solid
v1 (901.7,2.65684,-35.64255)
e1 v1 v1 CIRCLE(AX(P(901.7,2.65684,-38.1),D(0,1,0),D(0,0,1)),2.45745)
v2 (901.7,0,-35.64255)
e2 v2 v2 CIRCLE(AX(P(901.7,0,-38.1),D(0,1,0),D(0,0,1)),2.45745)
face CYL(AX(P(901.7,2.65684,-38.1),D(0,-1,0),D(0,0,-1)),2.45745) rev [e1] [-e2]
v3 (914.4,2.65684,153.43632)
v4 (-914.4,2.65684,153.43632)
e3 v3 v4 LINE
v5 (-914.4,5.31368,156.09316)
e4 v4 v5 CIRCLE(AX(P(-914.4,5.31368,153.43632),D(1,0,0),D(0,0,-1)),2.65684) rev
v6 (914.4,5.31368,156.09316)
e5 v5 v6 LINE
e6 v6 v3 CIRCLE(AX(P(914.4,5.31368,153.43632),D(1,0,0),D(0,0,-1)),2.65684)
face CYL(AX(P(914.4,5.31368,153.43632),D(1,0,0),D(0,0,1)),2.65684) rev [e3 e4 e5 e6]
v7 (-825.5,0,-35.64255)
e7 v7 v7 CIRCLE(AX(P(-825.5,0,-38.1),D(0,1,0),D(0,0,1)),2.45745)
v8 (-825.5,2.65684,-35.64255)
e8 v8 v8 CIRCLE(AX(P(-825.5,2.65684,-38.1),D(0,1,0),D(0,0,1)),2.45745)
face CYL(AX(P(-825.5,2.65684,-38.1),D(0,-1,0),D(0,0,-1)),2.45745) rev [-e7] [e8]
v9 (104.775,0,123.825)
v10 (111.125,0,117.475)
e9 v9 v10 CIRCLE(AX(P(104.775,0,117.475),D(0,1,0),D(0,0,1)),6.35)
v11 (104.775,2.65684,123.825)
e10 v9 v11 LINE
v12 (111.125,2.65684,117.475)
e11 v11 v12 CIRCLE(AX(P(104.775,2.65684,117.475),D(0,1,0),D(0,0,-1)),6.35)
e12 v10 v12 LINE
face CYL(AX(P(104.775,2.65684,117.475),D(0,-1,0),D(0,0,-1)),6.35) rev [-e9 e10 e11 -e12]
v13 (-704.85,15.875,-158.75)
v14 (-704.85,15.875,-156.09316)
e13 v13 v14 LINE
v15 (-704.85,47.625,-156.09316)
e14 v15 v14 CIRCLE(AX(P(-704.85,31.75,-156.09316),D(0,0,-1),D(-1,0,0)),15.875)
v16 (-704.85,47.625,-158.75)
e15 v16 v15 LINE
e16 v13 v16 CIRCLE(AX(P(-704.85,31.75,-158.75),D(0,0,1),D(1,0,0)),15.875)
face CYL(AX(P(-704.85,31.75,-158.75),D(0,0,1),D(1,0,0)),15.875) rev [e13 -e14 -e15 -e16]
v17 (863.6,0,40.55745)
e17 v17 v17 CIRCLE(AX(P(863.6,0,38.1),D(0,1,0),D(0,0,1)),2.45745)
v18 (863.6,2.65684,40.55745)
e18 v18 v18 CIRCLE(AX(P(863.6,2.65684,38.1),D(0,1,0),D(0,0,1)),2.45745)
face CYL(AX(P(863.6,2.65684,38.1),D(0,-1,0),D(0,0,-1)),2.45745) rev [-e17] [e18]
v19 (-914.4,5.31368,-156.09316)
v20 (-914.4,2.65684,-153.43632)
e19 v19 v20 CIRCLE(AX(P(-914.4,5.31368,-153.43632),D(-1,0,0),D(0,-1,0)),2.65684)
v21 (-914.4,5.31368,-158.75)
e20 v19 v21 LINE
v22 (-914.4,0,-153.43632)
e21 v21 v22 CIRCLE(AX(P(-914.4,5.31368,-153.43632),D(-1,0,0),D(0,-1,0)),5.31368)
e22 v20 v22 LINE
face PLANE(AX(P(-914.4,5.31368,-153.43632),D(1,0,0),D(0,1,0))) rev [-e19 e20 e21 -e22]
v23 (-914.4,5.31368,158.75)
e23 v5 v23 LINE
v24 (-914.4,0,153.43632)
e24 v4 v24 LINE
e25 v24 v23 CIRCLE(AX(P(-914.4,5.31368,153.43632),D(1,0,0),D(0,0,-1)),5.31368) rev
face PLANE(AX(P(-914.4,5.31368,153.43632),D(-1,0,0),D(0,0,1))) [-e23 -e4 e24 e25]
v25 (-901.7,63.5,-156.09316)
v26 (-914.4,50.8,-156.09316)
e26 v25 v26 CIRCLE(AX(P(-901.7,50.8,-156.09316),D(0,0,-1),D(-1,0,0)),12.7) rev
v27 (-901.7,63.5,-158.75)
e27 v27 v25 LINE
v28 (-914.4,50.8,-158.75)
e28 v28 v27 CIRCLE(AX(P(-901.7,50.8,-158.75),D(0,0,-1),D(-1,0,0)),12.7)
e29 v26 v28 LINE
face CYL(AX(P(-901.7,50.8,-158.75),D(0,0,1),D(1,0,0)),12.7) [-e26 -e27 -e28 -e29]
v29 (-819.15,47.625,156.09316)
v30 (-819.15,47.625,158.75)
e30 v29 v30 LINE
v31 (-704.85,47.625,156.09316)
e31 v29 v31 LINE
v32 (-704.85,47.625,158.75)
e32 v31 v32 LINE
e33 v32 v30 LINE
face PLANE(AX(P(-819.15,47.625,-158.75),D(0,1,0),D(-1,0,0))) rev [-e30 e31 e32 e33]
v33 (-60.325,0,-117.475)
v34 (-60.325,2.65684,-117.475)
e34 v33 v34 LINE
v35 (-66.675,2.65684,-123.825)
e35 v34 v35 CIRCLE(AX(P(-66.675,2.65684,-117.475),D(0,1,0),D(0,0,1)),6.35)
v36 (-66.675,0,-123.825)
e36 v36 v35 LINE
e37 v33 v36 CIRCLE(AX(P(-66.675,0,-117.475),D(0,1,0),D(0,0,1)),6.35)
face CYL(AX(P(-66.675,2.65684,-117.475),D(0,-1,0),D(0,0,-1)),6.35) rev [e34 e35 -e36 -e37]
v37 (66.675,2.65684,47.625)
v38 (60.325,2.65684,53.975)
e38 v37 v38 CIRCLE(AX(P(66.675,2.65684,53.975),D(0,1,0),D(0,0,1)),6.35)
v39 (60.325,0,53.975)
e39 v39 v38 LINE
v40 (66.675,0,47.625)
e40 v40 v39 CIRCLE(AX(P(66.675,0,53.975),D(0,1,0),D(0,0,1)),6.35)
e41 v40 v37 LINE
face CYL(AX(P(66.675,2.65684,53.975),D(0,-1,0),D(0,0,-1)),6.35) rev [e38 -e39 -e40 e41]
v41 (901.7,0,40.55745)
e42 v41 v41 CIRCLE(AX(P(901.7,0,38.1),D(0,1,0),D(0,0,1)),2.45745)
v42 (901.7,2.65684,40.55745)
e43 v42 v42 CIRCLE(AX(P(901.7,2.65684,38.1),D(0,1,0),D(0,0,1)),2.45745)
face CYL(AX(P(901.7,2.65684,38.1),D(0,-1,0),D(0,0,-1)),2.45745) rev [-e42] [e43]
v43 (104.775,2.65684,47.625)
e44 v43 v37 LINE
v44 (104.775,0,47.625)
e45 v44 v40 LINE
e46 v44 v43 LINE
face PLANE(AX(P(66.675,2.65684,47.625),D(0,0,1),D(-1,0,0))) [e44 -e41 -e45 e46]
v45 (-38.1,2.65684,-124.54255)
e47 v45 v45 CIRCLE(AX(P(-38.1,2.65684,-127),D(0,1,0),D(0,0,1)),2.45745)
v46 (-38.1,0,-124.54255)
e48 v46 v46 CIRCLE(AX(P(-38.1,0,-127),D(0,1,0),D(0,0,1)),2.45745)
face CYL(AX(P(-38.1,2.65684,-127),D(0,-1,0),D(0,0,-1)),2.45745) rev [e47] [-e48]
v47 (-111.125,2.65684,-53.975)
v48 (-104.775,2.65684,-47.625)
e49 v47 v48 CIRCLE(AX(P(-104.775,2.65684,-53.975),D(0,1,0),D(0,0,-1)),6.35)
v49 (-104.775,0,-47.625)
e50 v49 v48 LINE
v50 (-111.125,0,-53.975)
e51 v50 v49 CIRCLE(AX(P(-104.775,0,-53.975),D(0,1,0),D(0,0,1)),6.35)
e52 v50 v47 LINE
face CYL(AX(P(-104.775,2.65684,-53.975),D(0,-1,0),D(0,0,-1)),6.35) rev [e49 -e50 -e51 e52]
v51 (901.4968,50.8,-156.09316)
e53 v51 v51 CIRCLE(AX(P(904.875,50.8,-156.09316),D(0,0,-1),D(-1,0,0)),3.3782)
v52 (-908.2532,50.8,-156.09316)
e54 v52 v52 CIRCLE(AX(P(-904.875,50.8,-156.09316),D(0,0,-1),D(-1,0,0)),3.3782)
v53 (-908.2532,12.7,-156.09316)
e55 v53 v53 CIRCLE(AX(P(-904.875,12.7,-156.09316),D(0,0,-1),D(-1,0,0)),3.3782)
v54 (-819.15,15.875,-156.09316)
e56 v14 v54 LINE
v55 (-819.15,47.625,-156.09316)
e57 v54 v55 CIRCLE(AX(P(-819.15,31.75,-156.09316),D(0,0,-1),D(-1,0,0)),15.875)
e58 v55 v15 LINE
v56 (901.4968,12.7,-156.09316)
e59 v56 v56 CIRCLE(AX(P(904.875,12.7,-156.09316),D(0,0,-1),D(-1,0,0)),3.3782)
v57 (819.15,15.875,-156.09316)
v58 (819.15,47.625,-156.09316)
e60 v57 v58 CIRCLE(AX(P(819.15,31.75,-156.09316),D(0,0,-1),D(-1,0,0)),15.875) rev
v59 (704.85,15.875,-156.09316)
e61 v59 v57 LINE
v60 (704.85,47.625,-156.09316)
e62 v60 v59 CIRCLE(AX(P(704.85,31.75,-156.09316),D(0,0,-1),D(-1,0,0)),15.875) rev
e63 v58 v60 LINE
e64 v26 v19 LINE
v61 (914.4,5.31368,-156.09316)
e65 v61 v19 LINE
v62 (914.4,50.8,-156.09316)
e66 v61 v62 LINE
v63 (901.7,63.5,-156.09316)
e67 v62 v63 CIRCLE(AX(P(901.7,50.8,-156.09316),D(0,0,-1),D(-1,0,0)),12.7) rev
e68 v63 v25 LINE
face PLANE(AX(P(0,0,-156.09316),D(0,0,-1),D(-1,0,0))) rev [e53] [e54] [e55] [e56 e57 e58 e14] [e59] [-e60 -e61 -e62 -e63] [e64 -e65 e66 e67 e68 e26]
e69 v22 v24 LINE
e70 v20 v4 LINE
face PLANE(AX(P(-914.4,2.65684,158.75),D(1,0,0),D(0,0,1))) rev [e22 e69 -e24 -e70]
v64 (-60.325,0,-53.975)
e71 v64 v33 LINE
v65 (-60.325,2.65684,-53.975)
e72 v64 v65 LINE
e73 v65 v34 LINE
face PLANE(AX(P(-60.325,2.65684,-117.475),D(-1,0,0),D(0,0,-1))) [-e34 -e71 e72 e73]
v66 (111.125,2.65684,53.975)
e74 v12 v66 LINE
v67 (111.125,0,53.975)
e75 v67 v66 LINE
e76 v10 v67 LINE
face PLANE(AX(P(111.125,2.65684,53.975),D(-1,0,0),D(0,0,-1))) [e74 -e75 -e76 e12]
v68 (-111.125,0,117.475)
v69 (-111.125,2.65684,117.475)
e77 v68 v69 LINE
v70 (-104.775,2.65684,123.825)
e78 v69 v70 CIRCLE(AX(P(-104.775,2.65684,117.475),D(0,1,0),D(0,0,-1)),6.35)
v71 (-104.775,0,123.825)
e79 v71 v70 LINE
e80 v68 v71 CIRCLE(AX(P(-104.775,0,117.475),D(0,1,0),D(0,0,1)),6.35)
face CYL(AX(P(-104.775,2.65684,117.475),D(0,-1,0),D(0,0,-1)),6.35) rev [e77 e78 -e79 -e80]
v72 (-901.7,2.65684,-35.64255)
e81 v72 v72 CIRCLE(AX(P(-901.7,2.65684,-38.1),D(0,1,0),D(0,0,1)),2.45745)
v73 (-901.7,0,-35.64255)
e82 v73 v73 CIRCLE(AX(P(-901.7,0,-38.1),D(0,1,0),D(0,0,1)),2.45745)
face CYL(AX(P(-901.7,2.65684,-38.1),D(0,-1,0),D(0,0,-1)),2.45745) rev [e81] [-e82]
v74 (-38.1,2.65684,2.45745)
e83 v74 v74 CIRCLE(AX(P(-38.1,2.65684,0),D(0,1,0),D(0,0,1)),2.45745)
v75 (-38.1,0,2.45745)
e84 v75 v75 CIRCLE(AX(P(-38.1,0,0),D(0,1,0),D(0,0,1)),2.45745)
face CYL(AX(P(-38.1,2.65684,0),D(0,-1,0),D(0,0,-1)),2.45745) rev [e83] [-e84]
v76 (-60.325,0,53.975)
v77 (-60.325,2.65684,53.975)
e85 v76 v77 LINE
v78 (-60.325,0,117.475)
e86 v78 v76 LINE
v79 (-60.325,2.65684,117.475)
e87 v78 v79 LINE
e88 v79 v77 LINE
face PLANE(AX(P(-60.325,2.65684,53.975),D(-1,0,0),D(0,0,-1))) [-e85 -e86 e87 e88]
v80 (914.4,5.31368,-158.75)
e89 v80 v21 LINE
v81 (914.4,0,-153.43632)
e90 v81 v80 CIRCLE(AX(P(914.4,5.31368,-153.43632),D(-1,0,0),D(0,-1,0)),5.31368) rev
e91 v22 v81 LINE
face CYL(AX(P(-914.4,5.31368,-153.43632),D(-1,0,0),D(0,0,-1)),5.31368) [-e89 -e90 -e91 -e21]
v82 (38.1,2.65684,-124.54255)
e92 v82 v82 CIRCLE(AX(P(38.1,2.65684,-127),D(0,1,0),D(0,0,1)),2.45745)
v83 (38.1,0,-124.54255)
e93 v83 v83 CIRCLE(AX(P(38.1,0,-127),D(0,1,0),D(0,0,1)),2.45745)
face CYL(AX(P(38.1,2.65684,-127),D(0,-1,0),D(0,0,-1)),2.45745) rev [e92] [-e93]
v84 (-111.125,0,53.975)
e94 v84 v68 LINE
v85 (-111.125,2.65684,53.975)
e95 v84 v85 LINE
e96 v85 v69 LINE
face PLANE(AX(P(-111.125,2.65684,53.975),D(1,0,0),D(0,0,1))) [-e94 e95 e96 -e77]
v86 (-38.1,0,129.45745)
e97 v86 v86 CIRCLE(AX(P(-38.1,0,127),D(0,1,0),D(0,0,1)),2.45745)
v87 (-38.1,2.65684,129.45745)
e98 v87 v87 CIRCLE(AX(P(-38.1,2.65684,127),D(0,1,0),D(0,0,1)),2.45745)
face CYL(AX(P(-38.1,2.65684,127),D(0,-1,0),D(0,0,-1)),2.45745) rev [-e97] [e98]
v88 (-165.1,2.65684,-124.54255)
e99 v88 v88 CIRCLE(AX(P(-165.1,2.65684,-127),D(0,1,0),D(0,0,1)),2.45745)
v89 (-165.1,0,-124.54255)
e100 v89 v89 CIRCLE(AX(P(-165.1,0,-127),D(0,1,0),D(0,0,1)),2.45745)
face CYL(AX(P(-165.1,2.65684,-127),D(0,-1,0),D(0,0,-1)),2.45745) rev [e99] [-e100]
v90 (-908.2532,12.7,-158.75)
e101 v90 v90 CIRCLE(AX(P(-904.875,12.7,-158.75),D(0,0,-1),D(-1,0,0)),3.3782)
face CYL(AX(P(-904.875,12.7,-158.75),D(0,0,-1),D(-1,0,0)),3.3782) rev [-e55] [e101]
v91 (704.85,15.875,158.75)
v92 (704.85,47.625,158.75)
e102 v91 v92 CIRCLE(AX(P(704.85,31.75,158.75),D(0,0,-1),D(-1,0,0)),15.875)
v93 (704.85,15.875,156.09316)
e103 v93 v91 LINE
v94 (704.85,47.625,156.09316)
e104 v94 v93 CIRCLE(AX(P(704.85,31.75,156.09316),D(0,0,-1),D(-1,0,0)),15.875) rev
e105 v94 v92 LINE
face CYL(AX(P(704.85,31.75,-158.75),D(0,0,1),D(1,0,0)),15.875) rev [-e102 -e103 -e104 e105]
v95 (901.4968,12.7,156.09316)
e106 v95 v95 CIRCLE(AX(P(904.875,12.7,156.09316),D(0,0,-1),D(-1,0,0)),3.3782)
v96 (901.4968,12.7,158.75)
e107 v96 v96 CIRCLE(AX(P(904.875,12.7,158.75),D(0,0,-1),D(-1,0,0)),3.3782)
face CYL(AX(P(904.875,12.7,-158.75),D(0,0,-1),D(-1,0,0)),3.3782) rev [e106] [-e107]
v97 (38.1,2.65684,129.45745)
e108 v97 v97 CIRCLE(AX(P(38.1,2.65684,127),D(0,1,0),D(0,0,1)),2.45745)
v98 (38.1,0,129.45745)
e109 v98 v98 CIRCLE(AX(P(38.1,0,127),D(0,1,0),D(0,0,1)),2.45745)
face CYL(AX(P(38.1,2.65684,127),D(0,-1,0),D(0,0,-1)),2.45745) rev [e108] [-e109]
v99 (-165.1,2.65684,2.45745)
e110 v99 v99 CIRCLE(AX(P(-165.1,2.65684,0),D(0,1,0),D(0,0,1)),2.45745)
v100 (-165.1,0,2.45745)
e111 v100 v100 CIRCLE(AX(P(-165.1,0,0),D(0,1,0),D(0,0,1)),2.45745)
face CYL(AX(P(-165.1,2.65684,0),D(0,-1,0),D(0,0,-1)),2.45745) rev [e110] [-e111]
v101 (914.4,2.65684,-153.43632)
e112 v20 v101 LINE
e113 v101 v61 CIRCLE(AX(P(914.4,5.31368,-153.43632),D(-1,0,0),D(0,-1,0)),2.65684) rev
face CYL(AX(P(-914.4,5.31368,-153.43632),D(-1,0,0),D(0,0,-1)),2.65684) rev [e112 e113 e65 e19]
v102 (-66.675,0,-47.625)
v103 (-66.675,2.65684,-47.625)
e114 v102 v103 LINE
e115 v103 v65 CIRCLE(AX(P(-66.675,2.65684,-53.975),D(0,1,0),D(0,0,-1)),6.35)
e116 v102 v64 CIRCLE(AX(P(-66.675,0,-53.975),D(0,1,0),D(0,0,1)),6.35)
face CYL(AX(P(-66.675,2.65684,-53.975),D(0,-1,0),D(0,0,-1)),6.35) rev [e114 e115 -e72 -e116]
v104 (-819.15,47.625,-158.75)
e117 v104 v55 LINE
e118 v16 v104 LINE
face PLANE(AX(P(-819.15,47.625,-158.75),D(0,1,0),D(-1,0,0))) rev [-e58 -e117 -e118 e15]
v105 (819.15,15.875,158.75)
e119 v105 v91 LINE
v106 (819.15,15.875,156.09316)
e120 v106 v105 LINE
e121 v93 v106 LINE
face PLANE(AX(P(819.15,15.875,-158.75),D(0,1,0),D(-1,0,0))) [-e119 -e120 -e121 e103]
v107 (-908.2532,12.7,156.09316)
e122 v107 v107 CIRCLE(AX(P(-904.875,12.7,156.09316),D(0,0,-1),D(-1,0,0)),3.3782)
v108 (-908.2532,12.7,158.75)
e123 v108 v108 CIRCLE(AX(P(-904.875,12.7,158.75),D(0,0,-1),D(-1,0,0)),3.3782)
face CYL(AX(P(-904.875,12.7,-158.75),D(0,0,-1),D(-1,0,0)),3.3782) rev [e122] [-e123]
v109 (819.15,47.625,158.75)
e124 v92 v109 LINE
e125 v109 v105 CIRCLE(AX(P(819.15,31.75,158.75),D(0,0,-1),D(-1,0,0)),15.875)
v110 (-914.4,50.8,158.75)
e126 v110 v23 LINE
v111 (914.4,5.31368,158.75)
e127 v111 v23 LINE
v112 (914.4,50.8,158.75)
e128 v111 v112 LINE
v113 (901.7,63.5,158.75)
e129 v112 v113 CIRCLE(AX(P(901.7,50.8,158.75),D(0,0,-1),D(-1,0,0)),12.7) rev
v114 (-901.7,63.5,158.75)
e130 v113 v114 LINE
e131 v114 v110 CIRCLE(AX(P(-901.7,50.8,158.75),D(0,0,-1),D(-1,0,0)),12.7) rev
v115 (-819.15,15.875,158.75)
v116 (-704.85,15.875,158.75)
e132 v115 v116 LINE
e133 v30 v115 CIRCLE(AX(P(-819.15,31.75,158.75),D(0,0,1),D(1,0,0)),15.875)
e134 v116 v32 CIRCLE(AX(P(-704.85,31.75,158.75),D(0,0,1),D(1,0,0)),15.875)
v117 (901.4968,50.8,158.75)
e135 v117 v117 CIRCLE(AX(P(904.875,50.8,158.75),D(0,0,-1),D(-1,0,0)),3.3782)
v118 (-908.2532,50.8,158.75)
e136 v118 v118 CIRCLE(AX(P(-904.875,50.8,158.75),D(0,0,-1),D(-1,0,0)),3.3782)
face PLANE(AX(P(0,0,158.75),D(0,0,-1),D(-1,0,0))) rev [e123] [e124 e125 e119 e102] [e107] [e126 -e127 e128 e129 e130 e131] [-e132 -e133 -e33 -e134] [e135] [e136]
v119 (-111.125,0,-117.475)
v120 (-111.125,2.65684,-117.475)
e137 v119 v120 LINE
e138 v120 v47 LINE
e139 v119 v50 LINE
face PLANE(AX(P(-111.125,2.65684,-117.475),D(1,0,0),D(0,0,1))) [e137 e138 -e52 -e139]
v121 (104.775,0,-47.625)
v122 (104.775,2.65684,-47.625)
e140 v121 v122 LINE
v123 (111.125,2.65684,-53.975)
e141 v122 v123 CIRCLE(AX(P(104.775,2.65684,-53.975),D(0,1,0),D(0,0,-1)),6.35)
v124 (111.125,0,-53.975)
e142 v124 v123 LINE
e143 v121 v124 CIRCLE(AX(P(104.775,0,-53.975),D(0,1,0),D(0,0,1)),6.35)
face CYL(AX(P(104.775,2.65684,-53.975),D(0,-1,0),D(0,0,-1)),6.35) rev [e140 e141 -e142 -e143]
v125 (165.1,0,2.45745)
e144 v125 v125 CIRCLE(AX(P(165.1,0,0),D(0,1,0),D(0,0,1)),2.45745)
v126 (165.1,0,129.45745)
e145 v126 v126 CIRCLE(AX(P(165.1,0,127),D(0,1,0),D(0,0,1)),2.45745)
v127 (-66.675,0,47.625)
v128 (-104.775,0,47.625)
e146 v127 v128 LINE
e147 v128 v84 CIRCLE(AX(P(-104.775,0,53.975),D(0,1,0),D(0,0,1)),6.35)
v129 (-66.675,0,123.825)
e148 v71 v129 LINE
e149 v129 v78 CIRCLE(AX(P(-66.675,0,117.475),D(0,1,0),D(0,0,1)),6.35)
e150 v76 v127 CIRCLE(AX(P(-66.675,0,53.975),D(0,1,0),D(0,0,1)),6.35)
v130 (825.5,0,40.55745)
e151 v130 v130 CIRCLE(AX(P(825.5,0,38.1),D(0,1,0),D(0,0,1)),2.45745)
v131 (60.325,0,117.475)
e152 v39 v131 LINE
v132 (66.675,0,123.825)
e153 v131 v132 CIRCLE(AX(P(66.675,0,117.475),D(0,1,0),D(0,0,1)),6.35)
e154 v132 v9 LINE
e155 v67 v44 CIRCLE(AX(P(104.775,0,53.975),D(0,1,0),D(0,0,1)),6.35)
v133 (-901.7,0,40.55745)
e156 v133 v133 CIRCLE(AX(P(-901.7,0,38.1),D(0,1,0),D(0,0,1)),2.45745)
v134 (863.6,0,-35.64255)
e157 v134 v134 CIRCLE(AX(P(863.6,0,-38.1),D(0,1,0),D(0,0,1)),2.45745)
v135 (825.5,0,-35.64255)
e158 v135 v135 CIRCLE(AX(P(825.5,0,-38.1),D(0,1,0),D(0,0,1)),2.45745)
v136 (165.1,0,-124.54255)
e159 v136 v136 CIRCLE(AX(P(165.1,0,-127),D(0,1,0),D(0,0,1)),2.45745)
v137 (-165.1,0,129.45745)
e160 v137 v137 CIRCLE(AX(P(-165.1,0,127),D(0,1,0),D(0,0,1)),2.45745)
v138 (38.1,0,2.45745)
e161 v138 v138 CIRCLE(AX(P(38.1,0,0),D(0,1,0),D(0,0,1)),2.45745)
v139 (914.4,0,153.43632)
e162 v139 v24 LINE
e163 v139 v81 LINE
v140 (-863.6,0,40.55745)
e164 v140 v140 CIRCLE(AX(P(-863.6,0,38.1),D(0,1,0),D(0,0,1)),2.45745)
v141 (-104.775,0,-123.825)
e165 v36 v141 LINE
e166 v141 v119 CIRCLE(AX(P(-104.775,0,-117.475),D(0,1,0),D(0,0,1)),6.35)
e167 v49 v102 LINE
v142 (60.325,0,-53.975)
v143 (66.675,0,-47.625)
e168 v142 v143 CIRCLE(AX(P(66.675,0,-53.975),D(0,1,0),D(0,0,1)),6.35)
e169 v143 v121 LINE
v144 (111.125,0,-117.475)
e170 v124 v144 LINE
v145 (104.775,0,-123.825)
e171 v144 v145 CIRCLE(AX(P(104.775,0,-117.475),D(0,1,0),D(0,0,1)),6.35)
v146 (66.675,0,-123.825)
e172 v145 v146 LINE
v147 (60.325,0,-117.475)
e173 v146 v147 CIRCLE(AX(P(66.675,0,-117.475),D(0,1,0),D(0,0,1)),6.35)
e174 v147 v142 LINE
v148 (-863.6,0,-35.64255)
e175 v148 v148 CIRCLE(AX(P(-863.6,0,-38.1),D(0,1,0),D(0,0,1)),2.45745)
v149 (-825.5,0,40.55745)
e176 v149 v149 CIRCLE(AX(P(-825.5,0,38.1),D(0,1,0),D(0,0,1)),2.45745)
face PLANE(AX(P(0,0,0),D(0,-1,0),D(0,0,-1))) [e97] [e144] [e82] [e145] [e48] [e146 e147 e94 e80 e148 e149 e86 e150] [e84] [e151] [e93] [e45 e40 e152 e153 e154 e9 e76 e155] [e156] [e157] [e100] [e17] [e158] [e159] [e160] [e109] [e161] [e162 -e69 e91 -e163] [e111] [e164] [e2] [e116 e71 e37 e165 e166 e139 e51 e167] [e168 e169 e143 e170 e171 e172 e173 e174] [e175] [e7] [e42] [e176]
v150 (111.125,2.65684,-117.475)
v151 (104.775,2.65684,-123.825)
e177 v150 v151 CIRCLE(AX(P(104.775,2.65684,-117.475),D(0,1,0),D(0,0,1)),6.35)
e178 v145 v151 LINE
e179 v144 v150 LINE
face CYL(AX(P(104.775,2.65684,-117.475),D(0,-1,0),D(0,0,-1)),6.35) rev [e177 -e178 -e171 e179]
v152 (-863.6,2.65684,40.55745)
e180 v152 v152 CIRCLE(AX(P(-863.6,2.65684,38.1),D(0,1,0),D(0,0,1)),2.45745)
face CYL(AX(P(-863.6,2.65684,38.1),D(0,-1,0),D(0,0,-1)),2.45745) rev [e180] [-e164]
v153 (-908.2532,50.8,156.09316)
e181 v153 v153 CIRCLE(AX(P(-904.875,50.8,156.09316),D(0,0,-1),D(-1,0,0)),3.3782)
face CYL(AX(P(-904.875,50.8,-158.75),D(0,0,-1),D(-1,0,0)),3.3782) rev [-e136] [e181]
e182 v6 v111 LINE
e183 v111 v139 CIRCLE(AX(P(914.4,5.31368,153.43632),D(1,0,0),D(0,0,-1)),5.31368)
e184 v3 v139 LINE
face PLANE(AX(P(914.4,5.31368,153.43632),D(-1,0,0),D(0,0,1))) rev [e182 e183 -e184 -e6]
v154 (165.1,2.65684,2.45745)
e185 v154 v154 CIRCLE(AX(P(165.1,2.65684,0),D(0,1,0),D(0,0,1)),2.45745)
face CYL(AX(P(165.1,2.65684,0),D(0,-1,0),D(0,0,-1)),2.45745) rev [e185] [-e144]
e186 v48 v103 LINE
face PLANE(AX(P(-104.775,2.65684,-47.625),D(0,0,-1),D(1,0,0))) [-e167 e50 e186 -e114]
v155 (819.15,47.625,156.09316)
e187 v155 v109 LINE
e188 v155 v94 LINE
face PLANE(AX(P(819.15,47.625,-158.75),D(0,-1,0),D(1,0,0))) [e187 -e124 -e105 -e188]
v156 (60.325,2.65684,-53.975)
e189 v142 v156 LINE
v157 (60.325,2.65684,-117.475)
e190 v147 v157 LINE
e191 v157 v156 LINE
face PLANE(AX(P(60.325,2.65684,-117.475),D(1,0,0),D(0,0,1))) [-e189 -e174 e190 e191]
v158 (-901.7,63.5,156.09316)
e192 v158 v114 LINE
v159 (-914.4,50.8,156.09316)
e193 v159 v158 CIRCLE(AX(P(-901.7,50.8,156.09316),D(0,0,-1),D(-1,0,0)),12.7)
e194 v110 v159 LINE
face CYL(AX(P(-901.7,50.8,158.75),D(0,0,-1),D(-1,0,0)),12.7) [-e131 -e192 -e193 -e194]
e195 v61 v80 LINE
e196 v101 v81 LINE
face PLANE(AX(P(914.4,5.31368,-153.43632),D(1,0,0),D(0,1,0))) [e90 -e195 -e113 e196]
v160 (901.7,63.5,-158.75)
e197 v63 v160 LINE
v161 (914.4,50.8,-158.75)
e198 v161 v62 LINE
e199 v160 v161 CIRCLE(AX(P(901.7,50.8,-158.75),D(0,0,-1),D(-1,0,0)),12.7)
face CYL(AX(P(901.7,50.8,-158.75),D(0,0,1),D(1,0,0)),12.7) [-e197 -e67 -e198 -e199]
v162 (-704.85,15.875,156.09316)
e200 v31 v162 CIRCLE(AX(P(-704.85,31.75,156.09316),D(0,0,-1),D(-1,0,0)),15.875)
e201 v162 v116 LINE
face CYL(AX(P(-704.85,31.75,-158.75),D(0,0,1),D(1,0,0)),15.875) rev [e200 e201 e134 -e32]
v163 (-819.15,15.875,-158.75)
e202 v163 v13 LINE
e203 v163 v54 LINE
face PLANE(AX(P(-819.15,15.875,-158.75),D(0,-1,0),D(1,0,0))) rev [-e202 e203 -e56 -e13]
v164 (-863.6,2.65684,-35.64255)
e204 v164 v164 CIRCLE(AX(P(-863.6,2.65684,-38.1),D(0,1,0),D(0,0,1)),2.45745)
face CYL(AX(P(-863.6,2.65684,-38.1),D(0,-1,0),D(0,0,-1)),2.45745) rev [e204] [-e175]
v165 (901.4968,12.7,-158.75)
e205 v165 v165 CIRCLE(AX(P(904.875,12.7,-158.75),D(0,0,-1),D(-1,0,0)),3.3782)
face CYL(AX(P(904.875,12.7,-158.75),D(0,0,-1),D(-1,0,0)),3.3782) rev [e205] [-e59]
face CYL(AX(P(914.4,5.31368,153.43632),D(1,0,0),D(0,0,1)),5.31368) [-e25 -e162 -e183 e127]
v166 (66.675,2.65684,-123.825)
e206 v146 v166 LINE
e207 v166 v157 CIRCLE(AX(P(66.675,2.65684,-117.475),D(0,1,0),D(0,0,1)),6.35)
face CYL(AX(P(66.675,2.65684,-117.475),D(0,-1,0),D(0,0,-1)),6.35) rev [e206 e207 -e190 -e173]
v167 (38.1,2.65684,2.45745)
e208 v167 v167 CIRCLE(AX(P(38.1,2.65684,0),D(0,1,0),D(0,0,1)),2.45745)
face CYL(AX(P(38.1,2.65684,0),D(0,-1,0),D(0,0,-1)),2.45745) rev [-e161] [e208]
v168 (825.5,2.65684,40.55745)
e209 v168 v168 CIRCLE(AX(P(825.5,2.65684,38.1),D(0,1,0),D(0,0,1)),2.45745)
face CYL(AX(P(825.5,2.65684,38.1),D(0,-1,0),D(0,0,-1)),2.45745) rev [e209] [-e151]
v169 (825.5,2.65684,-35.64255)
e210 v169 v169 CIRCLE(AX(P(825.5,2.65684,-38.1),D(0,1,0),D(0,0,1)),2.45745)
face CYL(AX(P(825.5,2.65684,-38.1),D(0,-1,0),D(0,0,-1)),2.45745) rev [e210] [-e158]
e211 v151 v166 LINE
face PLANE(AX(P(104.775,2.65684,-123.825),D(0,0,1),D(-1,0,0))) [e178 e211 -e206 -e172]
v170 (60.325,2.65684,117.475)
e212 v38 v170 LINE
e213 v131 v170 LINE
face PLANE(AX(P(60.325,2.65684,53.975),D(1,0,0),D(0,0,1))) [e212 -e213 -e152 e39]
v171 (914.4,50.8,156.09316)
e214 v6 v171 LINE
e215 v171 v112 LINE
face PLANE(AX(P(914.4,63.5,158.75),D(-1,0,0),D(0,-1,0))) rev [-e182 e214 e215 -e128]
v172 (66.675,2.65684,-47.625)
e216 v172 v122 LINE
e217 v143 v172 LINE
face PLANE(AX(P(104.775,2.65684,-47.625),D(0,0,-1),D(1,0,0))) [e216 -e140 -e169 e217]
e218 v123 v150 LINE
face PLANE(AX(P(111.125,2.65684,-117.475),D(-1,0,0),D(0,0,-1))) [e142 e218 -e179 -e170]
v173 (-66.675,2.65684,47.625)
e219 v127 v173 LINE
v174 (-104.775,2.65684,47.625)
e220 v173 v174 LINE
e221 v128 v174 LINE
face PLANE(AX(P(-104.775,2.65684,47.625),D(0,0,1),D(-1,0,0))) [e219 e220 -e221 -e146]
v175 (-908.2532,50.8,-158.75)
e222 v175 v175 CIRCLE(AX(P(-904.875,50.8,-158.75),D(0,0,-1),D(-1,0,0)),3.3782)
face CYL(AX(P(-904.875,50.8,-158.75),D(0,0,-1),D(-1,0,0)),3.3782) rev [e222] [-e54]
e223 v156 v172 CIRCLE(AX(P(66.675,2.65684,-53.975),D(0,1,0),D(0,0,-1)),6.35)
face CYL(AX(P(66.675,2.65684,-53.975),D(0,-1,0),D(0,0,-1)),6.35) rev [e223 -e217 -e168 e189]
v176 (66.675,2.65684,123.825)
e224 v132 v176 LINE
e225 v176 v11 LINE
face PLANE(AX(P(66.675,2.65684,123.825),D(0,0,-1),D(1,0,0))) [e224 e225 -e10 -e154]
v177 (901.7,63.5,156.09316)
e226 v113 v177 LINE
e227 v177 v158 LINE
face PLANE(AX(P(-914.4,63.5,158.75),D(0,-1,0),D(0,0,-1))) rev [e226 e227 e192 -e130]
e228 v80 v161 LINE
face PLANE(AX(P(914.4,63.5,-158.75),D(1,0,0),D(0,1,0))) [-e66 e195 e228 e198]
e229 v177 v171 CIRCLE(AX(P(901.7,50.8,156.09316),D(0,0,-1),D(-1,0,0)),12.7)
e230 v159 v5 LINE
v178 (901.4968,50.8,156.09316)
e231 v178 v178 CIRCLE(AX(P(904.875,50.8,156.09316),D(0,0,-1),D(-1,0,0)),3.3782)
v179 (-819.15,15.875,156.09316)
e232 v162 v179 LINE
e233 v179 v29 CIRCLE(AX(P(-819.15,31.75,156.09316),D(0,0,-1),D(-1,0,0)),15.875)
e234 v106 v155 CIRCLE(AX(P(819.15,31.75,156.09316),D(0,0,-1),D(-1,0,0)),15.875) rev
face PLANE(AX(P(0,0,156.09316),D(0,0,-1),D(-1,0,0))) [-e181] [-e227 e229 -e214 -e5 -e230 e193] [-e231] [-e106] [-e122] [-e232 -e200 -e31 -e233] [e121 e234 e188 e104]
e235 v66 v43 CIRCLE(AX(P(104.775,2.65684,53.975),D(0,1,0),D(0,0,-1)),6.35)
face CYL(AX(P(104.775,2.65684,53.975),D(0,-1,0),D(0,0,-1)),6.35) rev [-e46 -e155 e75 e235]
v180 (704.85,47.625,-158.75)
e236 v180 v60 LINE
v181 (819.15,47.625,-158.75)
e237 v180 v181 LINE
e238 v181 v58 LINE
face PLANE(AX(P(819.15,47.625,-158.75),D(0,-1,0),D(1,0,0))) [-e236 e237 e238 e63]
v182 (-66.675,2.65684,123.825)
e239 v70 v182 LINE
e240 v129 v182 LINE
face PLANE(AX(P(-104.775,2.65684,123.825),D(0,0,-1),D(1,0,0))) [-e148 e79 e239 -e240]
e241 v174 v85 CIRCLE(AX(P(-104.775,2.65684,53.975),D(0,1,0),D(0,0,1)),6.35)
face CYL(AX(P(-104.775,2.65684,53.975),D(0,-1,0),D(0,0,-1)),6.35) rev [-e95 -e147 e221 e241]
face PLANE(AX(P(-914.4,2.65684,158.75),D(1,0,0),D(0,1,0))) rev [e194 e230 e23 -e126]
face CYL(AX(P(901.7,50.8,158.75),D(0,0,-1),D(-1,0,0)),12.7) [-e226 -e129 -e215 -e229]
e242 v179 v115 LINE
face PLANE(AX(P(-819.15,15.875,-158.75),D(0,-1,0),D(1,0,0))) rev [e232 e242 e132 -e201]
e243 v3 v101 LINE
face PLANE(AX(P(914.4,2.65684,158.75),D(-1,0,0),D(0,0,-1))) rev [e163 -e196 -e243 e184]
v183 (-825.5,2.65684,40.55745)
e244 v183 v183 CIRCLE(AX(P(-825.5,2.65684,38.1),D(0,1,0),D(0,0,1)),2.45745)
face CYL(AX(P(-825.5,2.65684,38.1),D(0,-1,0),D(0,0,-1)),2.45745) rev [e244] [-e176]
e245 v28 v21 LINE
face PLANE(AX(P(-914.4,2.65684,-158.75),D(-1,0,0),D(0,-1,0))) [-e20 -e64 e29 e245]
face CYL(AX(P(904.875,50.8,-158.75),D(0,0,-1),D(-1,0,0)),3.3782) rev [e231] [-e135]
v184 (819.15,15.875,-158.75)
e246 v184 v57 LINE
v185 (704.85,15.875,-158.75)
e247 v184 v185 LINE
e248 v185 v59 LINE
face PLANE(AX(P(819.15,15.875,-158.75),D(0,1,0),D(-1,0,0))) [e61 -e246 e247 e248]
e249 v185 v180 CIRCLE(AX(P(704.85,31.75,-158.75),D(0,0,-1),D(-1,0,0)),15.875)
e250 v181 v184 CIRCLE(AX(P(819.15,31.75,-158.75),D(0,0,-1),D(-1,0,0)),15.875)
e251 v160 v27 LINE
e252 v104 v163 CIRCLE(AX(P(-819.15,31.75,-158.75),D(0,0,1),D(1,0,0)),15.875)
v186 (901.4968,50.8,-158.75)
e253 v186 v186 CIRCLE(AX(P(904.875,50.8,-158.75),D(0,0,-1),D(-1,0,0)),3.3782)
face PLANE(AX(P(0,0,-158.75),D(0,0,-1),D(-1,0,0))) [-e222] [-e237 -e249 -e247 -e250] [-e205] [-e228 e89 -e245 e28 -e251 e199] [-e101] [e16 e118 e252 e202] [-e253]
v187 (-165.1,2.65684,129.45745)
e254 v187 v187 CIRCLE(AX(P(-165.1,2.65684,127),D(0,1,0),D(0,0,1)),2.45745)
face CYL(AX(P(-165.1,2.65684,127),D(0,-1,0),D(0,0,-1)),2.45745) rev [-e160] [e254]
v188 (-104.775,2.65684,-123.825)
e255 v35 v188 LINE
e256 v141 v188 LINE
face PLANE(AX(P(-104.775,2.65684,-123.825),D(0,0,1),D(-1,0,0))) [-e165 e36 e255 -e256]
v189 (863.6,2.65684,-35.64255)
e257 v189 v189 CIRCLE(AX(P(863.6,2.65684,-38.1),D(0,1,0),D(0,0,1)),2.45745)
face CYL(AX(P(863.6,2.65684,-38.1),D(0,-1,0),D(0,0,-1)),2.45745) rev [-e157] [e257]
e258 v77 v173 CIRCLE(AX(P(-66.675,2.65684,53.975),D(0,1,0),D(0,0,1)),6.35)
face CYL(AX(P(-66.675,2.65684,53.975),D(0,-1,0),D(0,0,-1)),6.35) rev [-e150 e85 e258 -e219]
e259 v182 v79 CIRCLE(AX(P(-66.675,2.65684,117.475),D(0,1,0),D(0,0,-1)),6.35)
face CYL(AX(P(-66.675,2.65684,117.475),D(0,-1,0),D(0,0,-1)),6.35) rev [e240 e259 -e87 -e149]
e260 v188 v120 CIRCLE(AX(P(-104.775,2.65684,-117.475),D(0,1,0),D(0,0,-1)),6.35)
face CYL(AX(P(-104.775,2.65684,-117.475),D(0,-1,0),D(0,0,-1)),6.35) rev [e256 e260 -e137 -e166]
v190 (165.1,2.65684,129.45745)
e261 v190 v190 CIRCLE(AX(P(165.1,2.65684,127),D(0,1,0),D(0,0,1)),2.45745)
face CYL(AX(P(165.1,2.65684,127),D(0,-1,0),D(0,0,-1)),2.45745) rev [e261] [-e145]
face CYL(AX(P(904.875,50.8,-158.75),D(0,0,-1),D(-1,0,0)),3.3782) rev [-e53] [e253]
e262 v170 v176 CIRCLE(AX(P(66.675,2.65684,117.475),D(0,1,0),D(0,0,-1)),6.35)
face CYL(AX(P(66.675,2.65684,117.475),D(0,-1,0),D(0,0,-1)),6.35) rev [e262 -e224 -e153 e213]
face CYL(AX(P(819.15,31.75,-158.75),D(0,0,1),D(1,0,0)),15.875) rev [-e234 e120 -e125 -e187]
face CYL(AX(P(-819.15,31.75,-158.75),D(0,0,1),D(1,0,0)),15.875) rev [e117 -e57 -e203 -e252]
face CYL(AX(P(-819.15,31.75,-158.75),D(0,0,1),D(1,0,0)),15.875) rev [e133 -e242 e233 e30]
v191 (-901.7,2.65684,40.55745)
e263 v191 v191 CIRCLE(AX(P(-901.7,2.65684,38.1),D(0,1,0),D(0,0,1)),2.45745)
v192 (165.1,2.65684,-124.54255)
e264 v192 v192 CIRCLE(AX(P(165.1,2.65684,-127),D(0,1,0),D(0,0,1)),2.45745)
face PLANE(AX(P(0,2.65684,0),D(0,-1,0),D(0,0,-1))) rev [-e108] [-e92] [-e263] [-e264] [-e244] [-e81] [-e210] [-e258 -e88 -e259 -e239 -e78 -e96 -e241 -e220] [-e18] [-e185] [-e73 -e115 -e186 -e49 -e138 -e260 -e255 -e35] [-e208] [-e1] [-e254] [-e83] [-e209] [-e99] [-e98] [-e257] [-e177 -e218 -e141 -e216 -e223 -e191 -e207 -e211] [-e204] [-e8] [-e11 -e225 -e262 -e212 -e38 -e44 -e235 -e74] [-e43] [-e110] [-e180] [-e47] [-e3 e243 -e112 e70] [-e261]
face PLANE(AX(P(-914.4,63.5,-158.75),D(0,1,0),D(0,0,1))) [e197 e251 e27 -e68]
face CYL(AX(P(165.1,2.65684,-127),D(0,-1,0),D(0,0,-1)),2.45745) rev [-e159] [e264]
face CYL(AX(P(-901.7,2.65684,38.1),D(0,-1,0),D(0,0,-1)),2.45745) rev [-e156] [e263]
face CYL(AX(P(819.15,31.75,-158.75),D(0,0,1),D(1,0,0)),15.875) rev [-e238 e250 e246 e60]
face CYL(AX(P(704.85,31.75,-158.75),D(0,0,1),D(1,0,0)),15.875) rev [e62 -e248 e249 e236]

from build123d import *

# Parameters (mm, degrees)
SKETCH1_W                        = 1828.8
SKETCH1_H                        = 317.5
BOSS_EXTRUDE1_DEPTH              = 2.65684
CUT_EXTRUDE1_DEPTH               = 929.081882863
SKETCH3_R                        = 2.3876
CUT_EXTRUDE2_DEPTH               = 929.081882863
LPATTERN1_COUNT                  = 2
LPATTERN1_PITCH                  = 203.2
F_10_0_1935_DIAMETER_HOLE1_D     = 4.9149
F_10_0_1935_DIAMETER_HOLE1_DEPTH = 2.65684
F_10_0_1935_DIAMETER_HOLE2_D     = 4.9149
EDGE_FLANGE1_STRIP_W             = 15.94104
EDGE_FLANGE1_STRIP_H             = 2.65684
EDGE_FLANGE1_STRIP_CUT_DEPTH     = 1828.8
EDGE_FLANGE1_DEPTH               = 1828.8
EDGE_FLANGE2_STRIP_W             = 15.94104
EDGE_FLANGE2_STRIP_H             = 2.65684
EDGE_FLANGE2_STRIP_CUT_DEPTH     = 1828.8
EDGE_FLANGE2_DEPTH               = 1828.8
FILLET1_R                        = 12.7
CUT_EXTRUDE3_DEPTH               = 971.03394786
F_1_4_CLEARANCE_HOLE1_D          = 6.7564


# Sheet-metal steps are written as plain solids
with BuildPart() as part:
    # Sketch1 → Boss-Extrude1 (new body)
    with BuildSketch(Plane(origin=(0, 0, 0), x_dir=(1, 0, 0), z_dir=(0, 1, 0))):
        Rectangle(SKETCH1_W, SKETCH1_H)
    extrude(amount=BOSS_EXTRUDE1_DEPTH)

    # Sketch2 → Cut-Extrude1 (cut, through all)
    with BuildSketch(Plane(origin=(0, 2.65684, 0), x_dir=(1, 0, 0), z_dir=(0, 1, 0))):
        with BuildLine():
            Line((-104.775, 123.825), (-66.675, 123.825))
            ThreePointArc((-66.675, 123.825), (-62.184871939, 121.965128061), (-60.325, 117.475))
            Line((-60.325, 117.475), (-60.325, 53.975))
            ThreePointArc((-60.325, 53.975), (-62.184871939, 49.484871939), (-66.675, 47.625))
            Line((-66.675, 47.625), (-104.775, 47.625))
            ThreePointArc((-104.775, 47.625), (-109.265128061, 49.484871939), (-111.125, 53.975))
            Line((-111.125, 53.975), (-111.125, 117.475))
            ThreePointArc((-111.125, 117.475), (-109.265128061, 121.965128061), (-104.775, 123.825))
        make_face()
        with BuildLine():
            Line((-104.775, -47.625), (-66.675, -47.625))
            ThreePointArc((-66.675, -47.625), (-62.184871939, -49.484871939), (-60.325, -53.975))
            Line((-60.325, -53.975), (-60.325, -117.475))
            ThreePointArc((-60.325, -117.475), (-62.184871939, -121.965128061), (-66.675, -123.825))
            Line((-66.675, -123.825), (-104.775, -123.825))
            ThreePointArc((-104.775, -123.825), (-109.265128061, -121.965128061), (-111.125, -117.475))
            Line((-111.125, -117.475), (-111.125, -53.975))
            ThreePointArc((-111.125, -53.975), (-109.265128061, -49.484871939), (-104.775, -47.625))
        make_face()
        with BuildLine():
            Line((66.675, -47.625), (104.775, -47.625))
            ThreePointArc((104.775, -47.625), (109.265128061, -49.484871939), (111.125, -53.975))
            Line((111.125, -53.975), (111.125, -117.475))
            ThreePointArc((111.125, -117.475), (109.265128061, -121.965128061), (104.775, -123.825))
            Line((104.775, -123.825), (66.675, -123.825))
            ThreePointArc((66.675, -123.825), (62.184871939, -121.965128061), (60.325, -117.475))
            Line((60.325, -117.475), (60.325, -53.975))
            ThreePointArc((60.325, -53.975), (62.184871939, -49.484871939), (66.675, -47.625))
        make_face()
        with BuildLine():
            Line((104.775, 123.825), (66.675, 123.825))
            ThreePointArc((66.675, 123.825), (62.184871939, 121.965128061), (60.325, 117.475))
            Line((60.325, 117.475), (60.325, 53.975))
            ThreePointArc((60.325, 53.975), (62.184871939, 49.484871939), (66.675, 47.625))
            Line((66.675, 47.625), (104.775, 47.625))
            ThreePointArc((104.775, 47.625), (109.265128061, 49.484871939), (111.125, 53.975))
            Line((111.125, 53.975), (111.125, 117.475))
            ThreePointArc((111.125, 117.475), (109.265128061, 121.965128061), (104.775, 123.825))
        make_face()
    extrude(amount=-CUT_EXTRUDE1_DEPTH, mode=Mode.SUBTRACT)

    # Sketch3 → Cut-Extrude2 (cut, through all)
    with BuildSketch(Plane(origin=(0, 2.65684, 0), x_dir=(1, 0, 0), z_dir=(0, 1, 0))):
        with Locations(Location((-165.1, 127, 0), (0, 0, 270))):
            Circle(SKETCH3_R)
        with Locations(Location((-165.1, 0, 0), (0, 0, 270))):
            Circle(SKETCH3_R)
        with Locations(Location((-165.1, -127, 0), (0, 0, 270))):
            Circle(SKETCH3_R)
        with Locations(Location((-38.1, 127, 0), (0, 0, 270))):
            Circle(SKETCH3_R)
        with Locations(Location((-38.1, 0, 0), (0, 0, 270))):
            Circle(SKETCH3_R)
        with Locations(Location((-38.1, -127, 0), (0, 0, 270))):
            Circle(SKETCH3_R)
    cut_extrude2 = extrude(amount=-CUT_EXTRUDE2_DEPTH, mode=Mode.SUBTRACT)

    # LPattern1: Cut-Extrude2 ×2
    with Locations(*[(i * LPATTERN1_PITCH, 0, 0) for i in range(1, LPATTERN1_COUNT)]):
        add(cut_extrude2, mode=Mode.SUBTRACT)

    # #10 (0.1935) Diameter Hole1
    with Locations(Plane(origin=(0, 2.65684, 0), x_dir=(1, 0, 0), z_dir=(0, 1, 0))):
        with Locations((165.1, 127), (38.1, 127), (-38.1, 127), (165.1, 0), (165.1, -127), (-38.1, 0), (38.1, 0), (38.1, -127), (-38.1, -127), (-165.1, -127), (-165.1, 0), (-165.1, 127)):
            Hole(F_10_0_1935_DIAMETER_HOLE1_D / 2, depth=F_10_0_1935_DIAMETER_HOLE1_DEPTH)

    # #10 (0.1935) Diameter Hole2 (through all)
    with Locations(Plane(origin=(0, 2.65684, 0), x_dir=(1, 0, 0), z_dir=(0, 1, 0))):
        with Locations((901.7, 38.1), (863.6, 38.1), (825.5, 38.1), (825.5, -38.1), (863.6, -38.1), (901.7, -38.1)):
            f_10_0_1935_diameter_hole2 = Hole(F_10_0_1935_DIAMETER_HOLE2_D / 2)

    # Mirror1: #10 (0.1935) Diameter Hole2 across plane
    add(f_10_0_1935_diameter_hole2.mirror(Plane(origin=(0, 0, 0), x_dir=(0, 0, 1), z_dir=(1, 0, 0))), mode=Mode.SUBTRACT)

    # Edge-Flange1 strip (across the edge) → Edge-Flange1 strip cut (cut)
    with BuildSketch(Plane(origin=(914.4, 2.65684, -158.75), x_dir=(0, 0, 1), z_dir=(-1, 0, 0))):
        with Locations((-2.65684, -1.32842)):
            Rectangle(EDGE_FLANGE1_STRIP_W, EDGE_FLANGE1_STRIP_H)
    extrude(amount=EDGE_FLANGE1_STRIP_CUT_DEPTH, mode=Mode.SUBTRACT)

    # Edge-Flange1 section (across the edge) → Edge-Flange1 (add)
    with BuildSketch(Plane(origin=(914.4, 2.65684, -158.75), x_dir=(0, 0, 1), z_dir=(-1, 0, 0))):
        with BuildLine():
            Line((0, 2.65684), (0, 60.84316))
            Line((0, 60.84316), (2.65684, 60.84316))
            Line((2.65684, 60.84316), (2.65684, 2.65684))
            ThreePointArc((2.65684, 2.65684), (3.435010419, 0.778170419), (5.31368, 0))
            Line((5.31368, 0), (5.31368, -2.65684))
            ThreePointArc((5.31368, -2.65684), (1.556340839, -1.100499161), (0, 2.65684))
        make_face()
    extrude(amount=EDGE_FLANGE1_DEPTH)

    # Edge-Flange2 strip (across the edge) → Edge-Flange2 strip cut (cut)
    with BuildSketch(Plane(origin=(-914.4, 2.65684, 158.75), x_dir=(0, 0, -1), z_dir=(1, 0, 0))):
        with Locations((-2.65684, -1.32842)):
            Rectangle(EDGE_FLANGE2_STRIP_W, EDGE_FLANGE2_STRIP_H)
    extrude(amount=EDGE_FLANGE2_STRIP_CUT_DEPTH, mode=Mode.SUBTRACT)

    # Edge-Flange2 section (across the edge) → Edge-Flange2 (add)
    with BuildSketch(Plane(origin=(-914.4, 2.65684, 158.75), x_dir=(0, 0, -1), z_dir=(1, 0, 0))):
        with BuildLine():
            Line((0, 2.65684), (0, 60.84316))
            Line((0, 60.84316), (2.65684, 60.84316))
            Line((2.65684, 60.84316), (2.65684, 2.65684))
            ThreePointArc((2.65684, 2.65684), (3.435010419, 0.778170419), (5.31368, 0))
            Line((5.31368, 0), (5.31368, -2.65684))
            ThreePointArc((5.31368, -2.65684), (1.556340839, -1.100499161), (0, 2.65684))
        make_face()
    extrude(amount=EDGE_FLANGE2_DEPTH)

    # Fillet1
    fillet1_edges = [part.edges().sort_by_distance(p)[0] for p in [
        (914.4, 63.5, -157.42158),
        (-914.4, 63.5, -157.42158),
        (-914.4, 63.5, 157.42158),
        (914.4, 63.5, 157.42158),
    ]]
    fillet(fillet1_edges, radius=FILLET1_R)

    # Sketch21 → Cut-Extrude3 (cut, through all)
    with BuildSketch(Plane.XY.offset(158.75)):
        with BuildLine():
            Line((-819.15, 47.625), (-704.85, 47.625))
            ThreePointArc((-704.85, 47.625), (-688.975, 31.75), (-704.85, 15.875))
            Line((-704.85, 15.875), (-819.15, 15.875))
            ThreePointArc((-819.15, 15.875), (-835.025, 31.75), (-819.15, 47.625))
        make_face()
    cut_extrude3 = extrude(amount=-CUT_EXTRUDE3_DEPTH, mode=Mode.SUBTRACT)

    # 1/4 Clearance Hole1 (through all)
    with Locations(Plane(origin=(0, 0, -158.75), x_dir=(-1, 0, 0), z_dir=(0, 0, -1))):
        with Locations((904.875, 50.8), (904.875, 12.7)):
            f_1_4_clearance_hole1 = Hole(F_1_4_CLEARANCE_HOLE1_D / 2)

    # Mirror2: Cut-Extrude3, 1/4 Clearance Hole1 across plane
    add(cut_extrude3.mirror(Plane(origin=(0, 0, 0), x_dir=(0, 0, 1), z_dir=(1, 0, 0))), mode=Mode.SUBTRACT)
    add(f_1_4_clearance_hole1.mirror(Plane(origin=(0, 0, 0), x_dir=(0, 0, 1), z_dir=(1, 0, 0))), mode=Mode.SUBTRACT)


solid = part.part
